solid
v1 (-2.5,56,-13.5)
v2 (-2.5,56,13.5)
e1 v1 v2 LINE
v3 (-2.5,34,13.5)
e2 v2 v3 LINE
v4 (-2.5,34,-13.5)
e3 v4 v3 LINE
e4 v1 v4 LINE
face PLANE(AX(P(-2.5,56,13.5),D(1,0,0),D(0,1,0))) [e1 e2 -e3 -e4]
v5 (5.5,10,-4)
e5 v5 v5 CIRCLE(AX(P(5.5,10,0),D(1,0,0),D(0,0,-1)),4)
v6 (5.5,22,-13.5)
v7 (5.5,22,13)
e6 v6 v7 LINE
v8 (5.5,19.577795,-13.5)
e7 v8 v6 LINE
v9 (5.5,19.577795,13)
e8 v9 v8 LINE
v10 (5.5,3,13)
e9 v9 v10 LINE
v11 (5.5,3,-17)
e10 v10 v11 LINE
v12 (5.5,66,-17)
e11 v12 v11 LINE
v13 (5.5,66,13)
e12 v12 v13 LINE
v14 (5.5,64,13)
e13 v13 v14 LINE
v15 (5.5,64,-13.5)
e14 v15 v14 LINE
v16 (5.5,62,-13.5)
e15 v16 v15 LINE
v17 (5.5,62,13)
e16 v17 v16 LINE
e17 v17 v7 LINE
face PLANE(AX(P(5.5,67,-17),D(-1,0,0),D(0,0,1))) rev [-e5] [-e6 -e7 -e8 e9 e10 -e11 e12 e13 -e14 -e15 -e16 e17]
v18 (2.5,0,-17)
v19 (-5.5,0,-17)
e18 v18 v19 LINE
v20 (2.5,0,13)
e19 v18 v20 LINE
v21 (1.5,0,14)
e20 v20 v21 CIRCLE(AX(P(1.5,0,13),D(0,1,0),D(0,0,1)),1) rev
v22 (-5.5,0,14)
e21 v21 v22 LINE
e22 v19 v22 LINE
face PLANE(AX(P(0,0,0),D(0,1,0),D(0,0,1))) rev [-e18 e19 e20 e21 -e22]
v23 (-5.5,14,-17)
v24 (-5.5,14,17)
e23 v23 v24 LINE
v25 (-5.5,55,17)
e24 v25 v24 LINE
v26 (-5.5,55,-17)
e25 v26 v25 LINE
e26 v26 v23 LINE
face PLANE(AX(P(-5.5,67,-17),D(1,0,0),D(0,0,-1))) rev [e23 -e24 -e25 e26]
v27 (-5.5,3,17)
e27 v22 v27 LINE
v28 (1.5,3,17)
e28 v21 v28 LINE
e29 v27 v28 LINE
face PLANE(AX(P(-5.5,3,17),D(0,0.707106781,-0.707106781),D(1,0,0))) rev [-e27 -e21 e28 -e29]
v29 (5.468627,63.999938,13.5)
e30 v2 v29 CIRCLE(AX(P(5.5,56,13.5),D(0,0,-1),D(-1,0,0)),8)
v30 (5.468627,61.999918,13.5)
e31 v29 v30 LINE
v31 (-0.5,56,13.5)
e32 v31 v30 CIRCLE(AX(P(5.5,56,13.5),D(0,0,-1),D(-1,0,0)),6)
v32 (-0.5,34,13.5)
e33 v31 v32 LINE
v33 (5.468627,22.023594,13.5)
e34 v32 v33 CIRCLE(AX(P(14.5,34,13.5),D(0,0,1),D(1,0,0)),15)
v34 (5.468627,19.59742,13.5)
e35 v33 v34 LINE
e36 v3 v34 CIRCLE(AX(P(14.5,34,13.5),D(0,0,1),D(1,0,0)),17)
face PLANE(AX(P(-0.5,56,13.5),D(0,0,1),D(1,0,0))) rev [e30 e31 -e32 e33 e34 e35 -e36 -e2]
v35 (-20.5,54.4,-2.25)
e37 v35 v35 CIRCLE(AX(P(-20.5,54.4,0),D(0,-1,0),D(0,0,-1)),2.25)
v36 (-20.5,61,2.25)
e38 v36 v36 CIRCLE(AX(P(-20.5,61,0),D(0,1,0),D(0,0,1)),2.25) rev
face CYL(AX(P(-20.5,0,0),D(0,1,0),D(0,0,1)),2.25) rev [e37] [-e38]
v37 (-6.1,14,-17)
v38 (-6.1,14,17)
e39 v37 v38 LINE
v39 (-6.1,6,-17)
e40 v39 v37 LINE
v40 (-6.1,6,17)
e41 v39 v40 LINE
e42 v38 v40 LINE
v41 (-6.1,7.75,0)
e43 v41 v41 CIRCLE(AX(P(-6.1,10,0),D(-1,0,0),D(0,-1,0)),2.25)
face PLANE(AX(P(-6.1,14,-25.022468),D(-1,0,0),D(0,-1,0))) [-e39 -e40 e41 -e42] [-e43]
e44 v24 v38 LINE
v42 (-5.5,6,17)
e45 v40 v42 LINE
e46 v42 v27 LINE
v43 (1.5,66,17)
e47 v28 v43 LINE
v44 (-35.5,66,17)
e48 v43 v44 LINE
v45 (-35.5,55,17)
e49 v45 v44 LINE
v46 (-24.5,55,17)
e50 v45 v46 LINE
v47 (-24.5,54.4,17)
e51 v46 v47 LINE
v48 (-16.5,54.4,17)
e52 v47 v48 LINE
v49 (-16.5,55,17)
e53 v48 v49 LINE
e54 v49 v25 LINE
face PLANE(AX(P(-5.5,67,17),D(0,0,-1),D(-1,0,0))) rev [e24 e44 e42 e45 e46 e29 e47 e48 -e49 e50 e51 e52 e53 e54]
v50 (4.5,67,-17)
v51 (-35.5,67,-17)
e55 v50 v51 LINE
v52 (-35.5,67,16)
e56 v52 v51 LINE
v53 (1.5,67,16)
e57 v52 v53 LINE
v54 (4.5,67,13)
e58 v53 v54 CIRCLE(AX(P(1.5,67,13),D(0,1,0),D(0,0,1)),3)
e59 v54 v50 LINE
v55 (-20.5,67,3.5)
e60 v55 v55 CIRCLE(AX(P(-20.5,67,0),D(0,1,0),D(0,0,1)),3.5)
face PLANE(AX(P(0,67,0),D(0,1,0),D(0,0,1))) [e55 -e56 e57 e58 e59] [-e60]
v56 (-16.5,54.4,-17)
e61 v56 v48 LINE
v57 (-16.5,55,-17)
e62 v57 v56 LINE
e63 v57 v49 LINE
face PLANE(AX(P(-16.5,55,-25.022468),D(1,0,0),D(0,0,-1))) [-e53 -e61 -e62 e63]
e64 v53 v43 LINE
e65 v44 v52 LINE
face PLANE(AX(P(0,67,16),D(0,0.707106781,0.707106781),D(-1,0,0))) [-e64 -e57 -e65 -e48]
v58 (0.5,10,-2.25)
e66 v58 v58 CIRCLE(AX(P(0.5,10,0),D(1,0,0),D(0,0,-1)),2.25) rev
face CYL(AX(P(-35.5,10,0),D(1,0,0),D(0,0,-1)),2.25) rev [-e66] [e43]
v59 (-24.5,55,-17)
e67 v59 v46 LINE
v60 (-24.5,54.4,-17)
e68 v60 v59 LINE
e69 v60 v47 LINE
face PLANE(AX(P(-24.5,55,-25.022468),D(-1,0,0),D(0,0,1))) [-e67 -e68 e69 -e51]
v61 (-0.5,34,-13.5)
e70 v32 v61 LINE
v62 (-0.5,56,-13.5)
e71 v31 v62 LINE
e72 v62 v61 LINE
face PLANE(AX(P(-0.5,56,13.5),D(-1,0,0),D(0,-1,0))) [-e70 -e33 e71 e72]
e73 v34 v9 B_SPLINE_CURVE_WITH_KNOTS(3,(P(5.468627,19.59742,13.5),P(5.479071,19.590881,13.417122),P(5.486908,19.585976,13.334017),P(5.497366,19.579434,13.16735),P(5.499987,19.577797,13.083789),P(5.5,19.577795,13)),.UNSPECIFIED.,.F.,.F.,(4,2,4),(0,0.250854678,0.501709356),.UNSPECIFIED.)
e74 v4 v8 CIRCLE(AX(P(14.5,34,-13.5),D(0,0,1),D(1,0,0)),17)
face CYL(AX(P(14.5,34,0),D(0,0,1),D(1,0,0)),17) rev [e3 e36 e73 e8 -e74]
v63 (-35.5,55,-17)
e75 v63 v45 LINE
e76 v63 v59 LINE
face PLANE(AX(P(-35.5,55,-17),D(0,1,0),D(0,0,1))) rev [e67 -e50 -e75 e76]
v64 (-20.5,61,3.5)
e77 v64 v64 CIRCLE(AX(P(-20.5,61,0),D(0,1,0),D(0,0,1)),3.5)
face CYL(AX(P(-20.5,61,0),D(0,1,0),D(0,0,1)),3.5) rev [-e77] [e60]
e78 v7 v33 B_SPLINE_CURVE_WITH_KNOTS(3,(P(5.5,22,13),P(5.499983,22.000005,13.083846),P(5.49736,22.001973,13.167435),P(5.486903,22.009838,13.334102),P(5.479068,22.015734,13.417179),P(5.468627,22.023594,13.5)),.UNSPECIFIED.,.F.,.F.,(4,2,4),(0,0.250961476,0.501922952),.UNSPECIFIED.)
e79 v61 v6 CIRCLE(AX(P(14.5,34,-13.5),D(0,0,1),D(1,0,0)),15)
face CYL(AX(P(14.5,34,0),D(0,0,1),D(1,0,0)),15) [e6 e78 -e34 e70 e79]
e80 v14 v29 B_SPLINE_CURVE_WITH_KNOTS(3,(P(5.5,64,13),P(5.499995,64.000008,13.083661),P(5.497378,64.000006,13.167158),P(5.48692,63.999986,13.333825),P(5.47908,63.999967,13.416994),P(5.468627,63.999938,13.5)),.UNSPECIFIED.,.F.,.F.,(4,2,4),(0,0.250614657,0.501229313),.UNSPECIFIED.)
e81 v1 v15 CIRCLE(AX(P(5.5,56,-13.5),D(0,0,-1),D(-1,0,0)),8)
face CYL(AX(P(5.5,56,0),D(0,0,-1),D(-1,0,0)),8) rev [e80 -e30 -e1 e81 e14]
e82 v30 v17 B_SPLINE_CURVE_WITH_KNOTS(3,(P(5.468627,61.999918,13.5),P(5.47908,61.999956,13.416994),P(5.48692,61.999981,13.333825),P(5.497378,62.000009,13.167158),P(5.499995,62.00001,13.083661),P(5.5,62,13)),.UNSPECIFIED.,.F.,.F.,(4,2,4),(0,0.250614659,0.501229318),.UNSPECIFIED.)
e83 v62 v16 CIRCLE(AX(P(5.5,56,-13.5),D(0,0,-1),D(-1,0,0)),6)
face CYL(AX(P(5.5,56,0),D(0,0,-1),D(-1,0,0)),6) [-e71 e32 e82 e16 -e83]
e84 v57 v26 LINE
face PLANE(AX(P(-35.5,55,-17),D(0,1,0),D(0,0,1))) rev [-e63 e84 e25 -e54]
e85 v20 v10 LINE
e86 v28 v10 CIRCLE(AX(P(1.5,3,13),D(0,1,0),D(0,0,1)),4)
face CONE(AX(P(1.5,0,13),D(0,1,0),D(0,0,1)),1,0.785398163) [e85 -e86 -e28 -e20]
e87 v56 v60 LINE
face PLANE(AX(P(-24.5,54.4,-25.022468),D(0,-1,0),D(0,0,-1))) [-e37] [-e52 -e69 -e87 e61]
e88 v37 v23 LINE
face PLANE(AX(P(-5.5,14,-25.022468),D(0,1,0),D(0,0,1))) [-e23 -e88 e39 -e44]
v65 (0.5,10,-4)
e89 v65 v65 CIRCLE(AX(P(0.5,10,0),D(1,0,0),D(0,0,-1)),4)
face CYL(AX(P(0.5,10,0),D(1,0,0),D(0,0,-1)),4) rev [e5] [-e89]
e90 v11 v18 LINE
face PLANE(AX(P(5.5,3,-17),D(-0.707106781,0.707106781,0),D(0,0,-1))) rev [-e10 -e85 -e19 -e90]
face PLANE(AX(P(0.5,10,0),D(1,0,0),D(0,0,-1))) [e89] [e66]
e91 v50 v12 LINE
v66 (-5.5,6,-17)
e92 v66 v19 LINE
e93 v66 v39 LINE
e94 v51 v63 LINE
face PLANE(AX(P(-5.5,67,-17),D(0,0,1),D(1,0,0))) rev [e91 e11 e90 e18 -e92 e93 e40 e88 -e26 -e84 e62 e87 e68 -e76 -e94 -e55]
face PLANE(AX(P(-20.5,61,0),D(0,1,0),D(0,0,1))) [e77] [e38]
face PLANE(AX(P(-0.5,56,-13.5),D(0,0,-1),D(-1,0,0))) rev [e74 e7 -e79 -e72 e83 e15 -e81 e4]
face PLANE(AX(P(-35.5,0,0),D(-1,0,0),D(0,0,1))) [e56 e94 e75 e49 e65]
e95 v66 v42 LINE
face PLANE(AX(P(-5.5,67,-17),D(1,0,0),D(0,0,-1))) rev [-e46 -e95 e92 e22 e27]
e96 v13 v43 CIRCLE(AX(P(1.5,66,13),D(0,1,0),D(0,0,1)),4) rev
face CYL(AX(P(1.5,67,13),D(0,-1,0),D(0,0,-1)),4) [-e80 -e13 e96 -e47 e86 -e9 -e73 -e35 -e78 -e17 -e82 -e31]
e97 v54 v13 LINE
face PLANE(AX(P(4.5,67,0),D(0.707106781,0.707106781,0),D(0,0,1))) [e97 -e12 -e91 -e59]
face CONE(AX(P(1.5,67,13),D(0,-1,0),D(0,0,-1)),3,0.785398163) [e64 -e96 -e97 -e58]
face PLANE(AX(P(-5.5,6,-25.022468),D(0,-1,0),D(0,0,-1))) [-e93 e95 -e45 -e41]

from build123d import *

# Parameters (mm, degrees)
SKETCH2_W           = 11
SKETCH2_H           = 34
BOSS_EXTRUDE1_DEPTH = 67
SKETCH3_W           = 34
SKETCH3_H           = 12
BOSS_EXTRUDE2_DEPTH = 30
SKETCH10_W          = 8
SKETCH10_H          = 0.6
SKETCH10_W_2        = 0.6
SKETCH10_H_2        = 8
BOSS_EXTRUDE3_DEPTH = 34
CUT_SWEEP1_START    = -13.5
CUT_SWEEP1_DEPTH    = 27
FILLET1_R           = 4
SKETCH7_R           = 2.25
CUT_EXTRUDE1_DEPTH  = 78.706177469
SKETCH8_R           = 2.25
CUT_EXTRUDE2_DEPTH  = 81.367904146
CHAMFER1_SIZE       = 3
CHAMFER2_SIZE       = 1
SKETCH9_R           = 3.5
CUT_EXTRUDE3_DEPTH  = 6
SKETCH11_R          = 4
CUT_EXTRUDE4_DEPTH  = 5


# Read off the part's stored shape, not the designer's step: Cut-Sweep1
with BuildPart() as part:
    # Sketch2 → Boss-Extrude1 (new body)
    with BuildSketch(Plane(origin=(0, 0, 0), x_dir=(1, 0, 0), z_dir=(0, 1, 0))):
        Rectangle(SKETCH2_W, SKETCH2_H)
    extrude(amount=BOSS_EXTRUDE1_DEPTH)

    # Sketch3 → Boss-Extrude2 (add)
    with BuildSketch(Plane.ZY.offset(5.5)):
        with Locations((0, 61)):
            Rectangle(SKETCH3_W, SKETCH3_H)
    extrude(amount=BOSS_EXTRUDE2_DEPTH)

    # Sketch10 → Boss-Extrude3 (add)
    with BuildSketch(Plane.XY.offset(17)):
        with Locations((-20.5, 54.7)):
            Rectangle(SKETCH10_W, SKETCH10_H)
        with Locations((-5.8, 10)):
            Rectangle(SKETCH10_W_2, SKETCH10_H_2)
    extrude(amount=-BOSS_EXTRUDE3_DEPTH)

    # Cut-Sweep1 outline → Cut-Sweep1 (cut)
    with BuildSketch(Plane.XY.offset(CUT_SWEEP1_START)):
        with BuildLine():
            ThreePointArc((5.5, 22), (1.083592135, 27.291796068), (-0.5, 34))
            Line((-0.5, 34), (-0.5, 56))
            ThreePointArc((-0.5, 56), (1.257359313, 60.242640687), (5.5, 62))
            Line((5.5, 62), (5.5, 64))
            ThreePointArc((5.5, 64), (-0.156854249, 61.656854249), (-2.5, 56))
            Line((-2.5, 56), (-2.5, 34))
            ThreePointArc((-2.5, 34), (-0.366068747, 25.753788749), (5.5, 19.577794898))
            Line((5.5, 19.577794898), (5.5, 22))
        make_face()
    extrude(amount=CUT_SWEEP1_DEPTH, mode=Mode.SUBTRACT)

    # Fillet1
    # the kernel refuses this fillet: 4 mm, written as the material it takes off along each edge
    with BuildSketch(Plane(origin=(5.5, -10, 17), x_dir=(0, 0, -1), z_dir=(0, 1, 0))) as fillet1_piece_1:
        with BuildLine():
            CenterArc((FILLET1_R, FILLET1_R), FILLET1_R, 180, 90)
            Line((0, FILLET1_R), (0, 0))
            Line((0, 0), (FILLET1_R, 0))
        make_face()
    extrude(amount=87, mode=Mode.SUBTRACT)

    # Sketch7 → Cut-Extrude1 (cut, through all)
    with BuildSketch(Plane(origin=(0, 67, 0), x_dir=(1, 0, 0), z_dir=(0, 1, 0))):
        with Locations(Location((-20.5, 0, 0), (0, 0, 270))):
            Circle(SKETCH7_R)
    extrude(amount=-CUT_EXTRUDE1_DEPTH, mode=Mode.SUBTRACT)

    # Sketch8 → Cut-Extrude2 (cut, through all)
    with BuildSketch(Plane(origin=(5.5, 0, 0), x_dir=(0, 0, -1), z_dir=(1, 0, 0))):
        with Locations((0, 10)):
            Circle(SKETCH8_R)
    extrude(amount=-CUT_EXTRUDE2_DEPTH, mode=Mode.SUBTRACT)

    # Chamfer1
    chamfer1_edges = [part.edges().sort_by_distance(p)[0] for p in [
        (-2, 0, 17),
        (5.5, 0, -2),
        (4.328427125, 0, 15.828427125),
    ]]
    chamfer(chamfer1_edges, length=CHAMFER1_SIZE)

    # Chamfer2
    chamfer2_edges = [part.edges().sort_by_distance(p)[0] for p in [
        (-17, 67, 17),
        (5.5, 67, -2),
        (4.328427125, 67, 15.828427125),
    ]]
    chamfer(chamfer2_edges, length=CHAMFER2_SIZE)

    # Sketch9 → Cut-Extrude3 (cut)
    with BuildSketch(Plane(origin=(0, 67, 0), x_dir=(1, 0, 0), z_dir=(0, 1, 0))):
        with Locations(Location((-20.5, 0, 0), (0, 0, 270))):
            Circle(SKETCH9_R)
    extrude(amount=-CUT_EXTRUDE3_DEPTH, mode=Mode.SUBTRACT)

    # Sketch11 → Cut-Extrude4 (cut)
    with BuildSketch(Plane(origin=(5.5, 0, 0), x_dir=(0, 0, -1), z_dir=(1, 0, 0))):
        with Locations((0, 10)):
            Circle(SKETCH11_R)
    extrude(amount=-CUT_EXTRUDE4_DEPTH, mode=Mode.SUBTRACT)


solid = part.part
